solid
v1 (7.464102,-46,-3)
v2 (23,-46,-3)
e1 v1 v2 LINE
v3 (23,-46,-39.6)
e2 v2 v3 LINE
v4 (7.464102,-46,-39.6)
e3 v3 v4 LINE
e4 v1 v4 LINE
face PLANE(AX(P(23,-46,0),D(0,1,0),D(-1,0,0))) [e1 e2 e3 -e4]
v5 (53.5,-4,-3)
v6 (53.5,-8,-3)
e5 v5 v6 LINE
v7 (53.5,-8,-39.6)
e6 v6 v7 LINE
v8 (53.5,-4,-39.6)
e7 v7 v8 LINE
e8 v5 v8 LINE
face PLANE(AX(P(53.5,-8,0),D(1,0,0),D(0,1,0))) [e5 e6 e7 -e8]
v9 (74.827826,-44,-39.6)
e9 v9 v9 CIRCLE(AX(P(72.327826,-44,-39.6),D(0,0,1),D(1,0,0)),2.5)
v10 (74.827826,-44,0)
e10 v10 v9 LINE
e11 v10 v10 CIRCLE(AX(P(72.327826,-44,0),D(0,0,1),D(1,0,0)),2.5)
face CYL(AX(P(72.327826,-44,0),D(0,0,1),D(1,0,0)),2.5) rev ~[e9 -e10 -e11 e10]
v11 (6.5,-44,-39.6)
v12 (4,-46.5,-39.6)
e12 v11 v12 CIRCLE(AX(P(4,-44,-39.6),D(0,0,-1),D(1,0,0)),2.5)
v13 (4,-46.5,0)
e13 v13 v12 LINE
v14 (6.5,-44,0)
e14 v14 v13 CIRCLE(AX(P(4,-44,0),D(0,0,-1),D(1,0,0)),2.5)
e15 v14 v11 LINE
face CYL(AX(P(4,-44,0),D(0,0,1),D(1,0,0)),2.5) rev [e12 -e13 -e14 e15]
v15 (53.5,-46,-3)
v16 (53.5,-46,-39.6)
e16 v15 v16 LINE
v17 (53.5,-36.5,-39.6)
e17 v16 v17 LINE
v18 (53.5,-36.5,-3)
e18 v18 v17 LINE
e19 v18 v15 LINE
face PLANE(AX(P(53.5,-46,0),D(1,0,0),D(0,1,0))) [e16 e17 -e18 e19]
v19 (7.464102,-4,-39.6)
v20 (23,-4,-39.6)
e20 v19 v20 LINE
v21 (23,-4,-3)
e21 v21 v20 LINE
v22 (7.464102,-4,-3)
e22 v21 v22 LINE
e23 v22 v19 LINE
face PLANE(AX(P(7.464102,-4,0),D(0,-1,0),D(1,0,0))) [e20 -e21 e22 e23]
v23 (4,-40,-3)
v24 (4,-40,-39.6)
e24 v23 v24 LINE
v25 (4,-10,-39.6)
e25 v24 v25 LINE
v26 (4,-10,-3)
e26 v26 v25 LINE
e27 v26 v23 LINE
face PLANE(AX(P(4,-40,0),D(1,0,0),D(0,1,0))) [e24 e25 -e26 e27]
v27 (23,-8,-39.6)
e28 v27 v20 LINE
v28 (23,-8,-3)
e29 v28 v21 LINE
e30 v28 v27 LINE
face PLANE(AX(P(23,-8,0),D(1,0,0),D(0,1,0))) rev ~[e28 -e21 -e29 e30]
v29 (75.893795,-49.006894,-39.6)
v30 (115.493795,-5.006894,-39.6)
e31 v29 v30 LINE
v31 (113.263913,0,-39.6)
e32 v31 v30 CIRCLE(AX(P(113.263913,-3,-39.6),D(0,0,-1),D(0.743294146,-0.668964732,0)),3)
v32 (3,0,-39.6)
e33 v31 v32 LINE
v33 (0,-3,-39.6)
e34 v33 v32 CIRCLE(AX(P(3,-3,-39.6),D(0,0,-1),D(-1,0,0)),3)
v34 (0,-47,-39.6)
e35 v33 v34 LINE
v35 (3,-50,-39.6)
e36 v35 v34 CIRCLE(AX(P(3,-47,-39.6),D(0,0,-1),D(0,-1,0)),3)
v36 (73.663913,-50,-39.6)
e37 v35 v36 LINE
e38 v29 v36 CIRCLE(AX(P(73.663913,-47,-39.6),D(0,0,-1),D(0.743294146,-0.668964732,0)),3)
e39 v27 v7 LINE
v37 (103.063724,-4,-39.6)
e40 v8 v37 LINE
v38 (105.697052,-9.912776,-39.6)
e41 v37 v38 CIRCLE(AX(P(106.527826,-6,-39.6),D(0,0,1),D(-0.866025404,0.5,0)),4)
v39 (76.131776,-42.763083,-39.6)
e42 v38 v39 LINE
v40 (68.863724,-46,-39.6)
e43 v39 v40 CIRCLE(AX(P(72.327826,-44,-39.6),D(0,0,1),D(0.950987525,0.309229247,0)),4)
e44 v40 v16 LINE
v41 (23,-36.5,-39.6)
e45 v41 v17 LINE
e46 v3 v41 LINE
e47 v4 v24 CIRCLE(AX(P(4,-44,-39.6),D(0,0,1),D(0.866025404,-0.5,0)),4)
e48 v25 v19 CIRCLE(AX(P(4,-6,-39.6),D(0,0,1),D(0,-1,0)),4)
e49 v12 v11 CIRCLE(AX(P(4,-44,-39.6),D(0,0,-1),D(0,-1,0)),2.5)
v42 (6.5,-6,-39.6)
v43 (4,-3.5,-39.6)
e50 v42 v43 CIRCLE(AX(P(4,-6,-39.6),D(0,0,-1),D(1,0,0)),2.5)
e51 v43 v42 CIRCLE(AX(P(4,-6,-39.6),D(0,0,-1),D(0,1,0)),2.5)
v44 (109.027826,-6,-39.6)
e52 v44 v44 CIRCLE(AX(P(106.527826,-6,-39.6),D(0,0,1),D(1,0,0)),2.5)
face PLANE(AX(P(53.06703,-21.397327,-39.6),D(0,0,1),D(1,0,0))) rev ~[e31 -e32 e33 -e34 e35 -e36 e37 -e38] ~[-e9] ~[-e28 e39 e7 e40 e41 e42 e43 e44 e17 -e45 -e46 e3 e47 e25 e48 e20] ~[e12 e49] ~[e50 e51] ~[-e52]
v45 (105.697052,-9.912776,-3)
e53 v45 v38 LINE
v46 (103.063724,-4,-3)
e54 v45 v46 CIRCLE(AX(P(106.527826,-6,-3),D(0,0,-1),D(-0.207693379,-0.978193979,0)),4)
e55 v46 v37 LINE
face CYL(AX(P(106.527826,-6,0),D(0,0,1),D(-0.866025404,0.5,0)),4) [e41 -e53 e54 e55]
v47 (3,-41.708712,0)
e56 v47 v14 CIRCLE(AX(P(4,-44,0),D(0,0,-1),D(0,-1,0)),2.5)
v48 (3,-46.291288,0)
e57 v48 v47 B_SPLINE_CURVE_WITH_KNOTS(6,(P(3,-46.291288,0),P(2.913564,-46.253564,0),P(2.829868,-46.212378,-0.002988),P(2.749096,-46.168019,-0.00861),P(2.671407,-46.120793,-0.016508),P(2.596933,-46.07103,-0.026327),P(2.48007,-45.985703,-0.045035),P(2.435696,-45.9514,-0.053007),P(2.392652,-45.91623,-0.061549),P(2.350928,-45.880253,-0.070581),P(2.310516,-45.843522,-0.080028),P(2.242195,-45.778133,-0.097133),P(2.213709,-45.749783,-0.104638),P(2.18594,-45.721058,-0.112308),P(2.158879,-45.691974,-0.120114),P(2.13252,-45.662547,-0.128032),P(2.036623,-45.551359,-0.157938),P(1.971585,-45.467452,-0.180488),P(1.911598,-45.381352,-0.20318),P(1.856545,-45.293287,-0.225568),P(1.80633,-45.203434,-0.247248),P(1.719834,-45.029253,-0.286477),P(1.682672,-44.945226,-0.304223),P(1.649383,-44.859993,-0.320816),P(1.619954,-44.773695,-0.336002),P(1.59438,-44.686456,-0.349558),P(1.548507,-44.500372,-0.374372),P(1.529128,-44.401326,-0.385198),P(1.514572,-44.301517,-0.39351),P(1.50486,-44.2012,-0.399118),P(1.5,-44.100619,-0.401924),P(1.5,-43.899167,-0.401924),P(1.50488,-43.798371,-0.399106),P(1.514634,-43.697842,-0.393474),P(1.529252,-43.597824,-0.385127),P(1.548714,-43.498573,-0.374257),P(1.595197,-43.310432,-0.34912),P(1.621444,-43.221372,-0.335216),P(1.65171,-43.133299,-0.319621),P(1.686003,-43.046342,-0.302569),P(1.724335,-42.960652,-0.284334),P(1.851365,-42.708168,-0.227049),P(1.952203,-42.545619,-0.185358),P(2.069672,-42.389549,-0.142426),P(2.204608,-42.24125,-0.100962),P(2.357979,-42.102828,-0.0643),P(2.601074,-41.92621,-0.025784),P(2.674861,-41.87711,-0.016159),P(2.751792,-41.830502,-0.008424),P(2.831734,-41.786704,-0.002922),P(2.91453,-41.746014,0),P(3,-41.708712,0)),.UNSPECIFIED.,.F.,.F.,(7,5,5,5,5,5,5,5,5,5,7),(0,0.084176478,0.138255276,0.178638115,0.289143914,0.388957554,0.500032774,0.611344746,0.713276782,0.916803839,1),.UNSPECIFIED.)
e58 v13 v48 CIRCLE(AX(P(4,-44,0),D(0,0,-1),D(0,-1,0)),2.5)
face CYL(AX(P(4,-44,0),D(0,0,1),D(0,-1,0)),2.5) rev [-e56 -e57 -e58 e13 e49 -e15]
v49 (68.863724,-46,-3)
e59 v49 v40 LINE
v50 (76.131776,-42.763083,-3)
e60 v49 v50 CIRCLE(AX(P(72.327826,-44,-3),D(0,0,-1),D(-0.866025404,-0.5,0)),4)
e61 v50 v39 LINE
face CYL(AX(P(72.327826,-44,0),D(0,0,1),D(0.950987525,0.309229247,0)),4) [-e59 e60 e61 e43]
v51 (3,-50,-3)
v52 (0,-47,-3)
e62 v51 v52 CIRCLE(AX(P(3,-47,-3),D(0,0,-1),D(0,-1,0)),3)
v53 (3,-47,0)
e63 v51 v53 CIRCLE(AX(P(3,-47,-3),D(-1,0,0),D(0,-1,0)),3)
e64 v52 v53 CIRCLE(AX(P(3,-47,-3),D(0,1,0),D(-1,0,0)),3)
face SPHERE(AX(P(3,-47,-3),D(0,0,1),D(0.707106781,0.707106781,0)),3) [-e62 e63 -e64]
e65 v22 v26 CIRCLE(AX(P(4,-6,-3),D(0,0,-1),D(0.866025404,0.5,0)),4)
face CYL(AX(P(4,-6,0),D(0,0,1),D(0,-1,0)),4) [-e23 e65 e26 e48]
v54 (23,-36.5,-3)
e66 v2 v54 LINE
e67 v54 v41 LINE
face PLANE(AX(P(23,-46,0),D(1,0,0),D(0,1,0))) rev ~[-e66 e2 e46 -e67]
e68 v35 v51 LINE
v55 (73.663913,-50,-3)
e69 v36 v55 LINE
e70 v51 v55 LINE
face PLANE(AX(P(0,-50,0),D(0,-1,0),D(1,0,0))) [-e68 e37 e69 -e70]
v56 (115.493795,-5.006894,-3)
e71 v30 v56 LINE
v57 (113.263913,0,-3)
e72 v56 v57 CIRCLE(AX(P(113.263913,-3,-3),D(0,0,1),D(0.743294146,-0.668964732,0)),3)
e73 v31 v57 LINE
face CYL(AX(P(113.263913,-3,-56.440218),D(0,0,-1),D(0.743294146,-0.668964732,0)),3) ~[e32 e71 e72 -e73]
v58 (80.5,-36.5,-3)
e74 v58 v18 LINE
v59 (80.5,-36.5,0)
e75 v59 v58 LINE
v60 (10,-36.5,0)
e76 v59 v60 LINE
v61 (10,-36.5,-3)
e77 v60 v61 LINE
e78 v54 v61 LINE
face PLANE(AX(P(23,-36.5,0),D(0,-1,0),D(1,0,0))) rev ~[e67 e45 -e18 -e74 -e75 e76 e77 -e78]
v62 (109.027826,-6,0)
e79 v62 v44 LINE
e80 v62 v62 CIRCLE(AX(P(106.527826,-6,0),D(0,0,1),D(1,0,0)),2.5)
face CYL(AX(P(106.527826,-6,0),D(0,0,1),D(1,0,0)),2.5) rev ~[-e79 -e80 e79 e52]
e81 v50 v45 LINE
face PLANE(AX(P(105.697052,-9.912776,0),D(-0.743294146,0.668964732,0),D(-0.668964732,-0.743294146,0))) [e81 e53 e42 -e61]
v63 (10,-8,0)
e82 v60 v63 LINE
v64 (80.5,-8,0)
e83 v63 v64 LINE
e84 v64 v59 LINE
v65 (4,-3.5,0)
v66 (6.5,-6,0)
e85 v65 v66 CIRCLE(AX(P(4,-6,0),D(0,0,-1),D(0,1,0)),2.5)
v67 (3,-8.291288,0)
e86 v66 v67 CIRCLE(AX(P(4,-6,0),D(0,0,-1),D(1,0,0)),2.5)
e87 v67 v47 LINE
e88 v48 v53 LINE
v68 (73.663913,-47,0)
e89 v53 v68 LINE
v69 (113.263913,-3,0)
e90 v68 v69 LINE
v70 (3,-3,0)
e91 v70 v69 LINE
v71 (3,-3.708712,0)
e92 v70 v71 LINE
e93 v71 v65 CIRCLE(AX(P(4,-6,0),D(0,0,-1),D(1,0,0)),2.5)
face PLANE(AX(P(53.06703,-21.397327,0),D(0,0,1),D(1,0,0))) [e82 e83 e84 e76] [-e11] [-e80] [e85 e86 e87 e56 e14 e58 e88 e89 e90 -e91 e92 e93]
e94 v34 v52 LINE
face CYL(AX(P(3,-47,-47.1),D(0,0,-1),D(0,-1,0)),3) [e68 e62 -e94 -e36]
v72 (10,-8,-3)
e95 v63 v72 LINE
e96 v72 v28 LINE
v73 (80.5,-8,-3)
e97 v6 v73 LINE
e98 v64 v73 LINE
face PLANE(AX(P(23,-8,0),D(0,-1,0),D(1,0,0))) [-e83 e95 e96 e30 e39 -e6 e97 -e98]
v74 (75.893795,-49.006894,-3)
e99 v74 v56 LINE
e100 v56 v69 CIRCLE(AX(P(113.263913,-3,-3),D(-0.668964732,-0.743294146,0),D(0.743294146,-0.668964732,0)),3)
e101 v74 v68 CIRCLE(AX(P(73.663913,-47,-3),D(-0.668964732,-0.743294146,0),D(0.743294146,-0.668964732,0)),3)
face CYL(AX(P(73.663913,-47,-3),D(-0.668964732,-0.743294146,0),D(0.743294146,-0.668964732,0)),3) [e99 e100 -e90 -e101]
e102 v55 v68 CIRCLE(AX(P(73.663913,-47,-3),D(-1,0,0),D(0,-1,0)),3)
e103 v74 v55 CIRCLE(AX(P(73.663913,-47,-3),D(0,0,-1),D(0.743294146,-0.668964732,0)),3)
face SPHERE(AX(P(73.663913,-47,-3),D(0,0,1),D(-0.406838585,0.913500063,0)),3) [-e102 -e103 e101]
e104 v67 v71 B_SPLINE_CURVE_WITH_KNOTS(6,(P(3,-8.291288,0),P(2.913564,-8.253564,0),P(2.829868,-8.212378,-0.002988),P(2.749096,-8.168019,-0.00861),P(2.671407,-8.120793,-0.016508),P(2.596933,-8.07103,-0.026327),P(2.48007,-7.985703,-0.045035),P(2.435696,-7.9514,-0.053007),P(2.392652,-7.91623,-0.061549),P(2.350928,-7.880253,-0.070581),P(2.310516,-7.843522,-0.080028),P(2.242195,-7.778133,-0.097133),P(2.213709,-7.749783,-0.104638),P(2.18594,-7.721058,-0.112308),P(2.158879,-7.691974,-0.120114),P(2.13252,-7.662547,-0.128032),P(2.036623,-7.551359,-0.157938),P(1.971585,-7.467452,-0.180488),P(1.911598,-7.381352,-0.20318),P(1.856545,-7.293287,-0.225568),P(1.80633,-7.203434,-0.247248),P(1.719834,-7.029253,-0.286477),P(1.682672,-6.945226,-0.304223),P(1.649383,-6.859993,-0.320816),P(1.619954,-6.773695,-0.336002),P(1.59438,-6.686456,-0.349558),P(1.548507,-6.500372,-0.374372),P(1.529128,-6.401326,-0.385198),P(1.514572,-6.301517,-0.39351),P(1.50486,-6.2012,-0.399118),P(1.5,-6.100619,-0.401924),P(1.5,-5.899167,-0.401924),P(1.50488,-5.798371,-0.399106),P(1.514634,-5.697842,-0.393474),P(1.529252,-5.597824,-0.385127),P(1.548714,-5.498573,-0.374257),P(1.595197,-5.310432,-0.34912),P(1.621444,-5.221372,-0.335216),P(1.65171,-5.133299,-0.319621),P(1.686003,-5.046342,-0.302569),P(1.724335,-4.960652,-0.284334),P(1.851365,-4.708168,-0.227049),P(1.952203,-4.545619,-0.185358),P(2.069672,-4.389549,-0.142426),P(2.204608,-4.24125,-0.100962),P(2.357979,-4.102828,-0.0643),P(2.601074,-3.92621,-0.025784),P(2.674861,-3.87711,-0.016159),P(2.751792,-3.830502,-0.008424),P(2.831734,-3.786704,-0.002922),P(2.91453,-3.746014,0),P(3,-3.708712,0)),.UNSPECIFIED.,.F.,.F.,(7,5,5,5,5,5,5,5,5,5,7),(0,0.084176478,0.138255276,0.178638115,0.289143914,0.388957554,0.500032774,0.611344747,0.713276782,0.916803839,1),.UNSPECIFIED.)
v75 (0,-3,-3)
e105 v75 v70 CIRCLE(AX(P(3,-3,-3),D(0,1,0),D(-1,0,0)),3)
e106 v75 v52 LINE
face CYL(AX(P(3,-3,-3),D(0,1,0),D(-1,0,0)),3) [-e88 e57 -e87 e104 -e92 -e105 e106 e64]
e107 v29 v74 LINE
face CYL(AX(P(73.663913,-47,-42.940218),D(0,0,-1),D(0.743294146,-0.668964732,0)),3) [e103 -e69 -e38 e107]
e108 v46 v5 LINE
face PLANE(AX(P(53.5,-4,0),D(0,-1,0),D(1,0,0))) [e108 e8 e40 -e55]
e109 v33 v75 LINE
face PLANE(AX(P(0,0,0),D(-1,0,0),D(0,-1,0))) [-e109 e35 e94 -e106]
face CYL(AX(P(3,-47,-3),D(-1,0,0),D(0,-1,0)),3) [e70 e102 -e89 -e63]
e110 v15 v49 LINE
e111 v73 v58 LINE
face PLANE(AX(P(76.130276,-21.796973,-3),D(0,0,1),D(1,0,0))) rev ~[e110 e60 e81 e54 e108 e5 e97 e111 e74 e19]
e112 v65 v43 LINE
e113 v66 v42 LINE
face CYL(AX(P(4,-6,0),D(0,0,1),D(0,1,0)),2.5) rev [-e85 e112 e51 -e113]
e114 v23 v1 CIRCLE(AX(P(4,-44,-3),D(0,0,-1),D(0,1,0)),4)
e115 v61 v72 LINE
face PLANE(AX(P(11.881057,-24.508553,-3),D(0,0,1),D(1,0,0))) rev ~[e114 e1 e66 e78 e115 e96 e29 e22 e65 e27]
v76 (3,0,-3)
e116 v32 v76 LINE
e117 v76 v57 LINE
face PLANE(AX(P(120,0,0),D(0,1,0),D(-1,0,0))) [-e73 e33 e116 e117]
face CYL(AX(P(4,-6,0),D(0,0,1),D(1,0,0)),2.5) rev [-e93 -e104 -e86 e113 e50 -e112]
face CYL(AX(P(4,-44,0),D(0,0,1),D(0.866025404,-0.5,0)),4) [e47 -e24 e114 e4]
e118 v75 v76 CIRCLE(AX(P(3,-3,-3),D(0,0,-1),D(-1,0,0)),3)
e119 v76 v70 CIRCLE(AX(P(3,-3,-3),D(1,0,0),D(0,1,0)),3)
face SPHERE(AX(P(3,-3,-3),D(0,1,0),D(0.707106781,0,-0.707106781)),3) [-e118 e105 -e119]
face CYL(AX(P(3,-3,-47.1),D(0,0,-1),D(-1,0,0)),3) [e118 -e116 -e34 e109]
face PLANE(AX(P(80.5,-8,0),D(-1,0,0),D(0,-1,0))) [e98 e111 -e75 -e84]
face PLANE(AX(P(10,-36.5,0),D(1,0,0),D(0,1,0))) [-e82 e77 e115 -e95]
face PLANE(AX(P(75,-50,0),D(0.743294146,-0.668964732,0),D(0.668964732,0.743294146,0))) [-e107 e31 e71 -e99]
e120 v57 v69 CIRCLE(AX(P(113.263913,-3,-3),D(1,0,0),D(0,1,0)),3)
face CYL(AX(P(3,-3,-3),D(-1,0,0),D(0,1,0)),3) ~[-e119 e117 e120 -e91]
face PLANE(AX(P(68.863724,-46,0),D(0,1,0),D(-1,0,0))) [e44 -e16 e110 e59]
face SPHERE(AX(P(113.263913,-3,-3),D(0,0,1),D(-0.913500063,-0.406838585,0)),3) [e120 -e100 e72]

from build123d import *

# Parameters (mm, degrees)
F1_DEPTH     = 3
F0_R         = 2.5
F0_W         = 30.5
F0_H         = 9.5
F0_H_2       = 4
F2_DEPTH     = 39.6
F3_T1_DEPTH  = 70.6639127859
F3_T3_DEPTH  = 44.1
F3_T5_DEPTH  = 39.9402180353
F3_T7_DEPTH  = 59.1959458071
F3_T9_DEPTH  = 53.4402180353
F3_T11_DEPTH = 110.2639127859
F3_T13_DEPTH = 44
F3_S17_W     = 3
F3_S17_H     = 3
F3_T18_DEPTH = 3
F3_T24_DEPTH = 3
F3_T30_DEPTH = 3
F3_S35_W     = 3
F3_S35_H     = 3
F3_T36_DEPTH = 3


# Not quite as in the source:
# - a fillet or chamfer that OpenCascade refuses, or shapes differently, is made with other operations: its cross-section is extruded or revolved along the edge and cut away or added


with BuildPart() as f1:
    # F0 (on Top) → F1 (new body)
    with BuildSketch(Plane.XY):
        with BuildLine():
            Line((10, -36.5), (10, -8))
            Line((10, -8), (23, -8))
            Line((23, -8), (23, -4))
            Line((23, -4), (7.4641016151, -4))
            ThreePointArc((7.4641016151, -4), (7.4641016151, -8), (4, -10))
            Line((4, -10), (4, -40))
            ThreePointArc((4, -40), (7.4641016151, -42), (7.4641016151, -46))
            Line((7.4641016151, -46), (23, -46))
            Line((23, -46), (23, -36.5))
            Line((23, -36.5), (10, -36.5))
        make_face()
    extrude(amount=-F1_DEPTH)



with BuildPart() as f1b:
    # F0 (on Top) → F1, piece 2 (new body)
    with BuildSketch(Plane.XY):
        with BuildLine():
            Line((53.5, -4), (53.5, -8))
            Line((53.5, -8), (80.5, -8))
            Line((80.5, -8), (80.5, -36.5))
            Line((80.5, -36.5), (53.5, -36.5))
            Line((53.5, -36.5), (53.5, -46))
            Line((53.5, -46), (68.8637239566, -46))
            ThreePointArc((68.8637239566, -46), (70.700471232, -40.3459997464), (76.1317756715, -42.7630830107))
            Line((76.1317756715, -42.7630830107), (105.697052057, -9.9127759158))
            ThreePointArc((105.697052057, -9.9127759158), (102.8738253182, -7.6273543397), (103.0637239566, -4))
            Line((103.0637239566, -4), (53.5, -4))
        make_face()
    extrude(amount=-F1_DEPTH)


with BuildPart() as f1_1:
    add(f1.part)

    add(f1b.part)  # F2 merges F1b
    # F0 (on Top) → F2 (join)
    with BuildSketch(Plane.XY):
        Polygon((120, 0), (0, 0), (0, -50), (75, -50), align=None)
        with BuildLine():
            ThreePointArc((4, -46.5), (2.232233047, -42.232233047), (6.5, -44))
            ThreePointArc((6.5, -44), (5.767766953, -45.767766953), (4, -46.5))
        make_face(mode=Mode.SUBTRACT)
        with BuildLine():
            Line((7.4641016151, -4), (23, -4))
            Line((23, -4), (53.5, -4))
            Line((53.5, -4), (103.0637239566, -4))
            ThreePointArc((103.0637239566, -4), (102.8738253182, -7.6273543397), (105.697052057, -9.9127759158))
            Line((105.697052057, -9.9127759158), (76.1317756715, -42.7630830107))
            ThreePointArc((76.1317756715, -42.7630830107), (70.700471232, -40.3459997464), (68.8637239566, -46))
            Line((68.8637239566, -46), (53.5, -46))
            Line((53.5, -46), (23, -46))
            Line((23, -46), (7.4641016151, -46))
            ThreePointArc((7.4641016151, -46), (7.4641016151, -42), (4, -40))
            Line((4, -40), (4, -10))
            ThreePointArc((4, -10), (7.4641016151, -8), (7.4641016151, -4))
        make_face(mode=Mode.SUBTRACT)
        with Locations((72.3278255718, -44)):
            Circle(F0_R, mode=Mode.SUBTRACT)
        with BuildLine():
            ThreePointArc((4, -3.5), (5.767766953, -4.232233047), (6.5, -6))
            ThreePointArc((6.5, -6), (2.232233047, -7.767766953), (4, -3.5))
        make_face(mode=Mode.SUBTRACT)
        with Locations((106.5278255718, -6)):
            Circle(F0_R, mode=Mode.SUBTRACT)
        with Locations((38.25, -41.25)):
            Rectangle(F0_W, F0_H)
        with Locations((38.25, -6)):
            Rectangle(F0_W, F0_H_2)
    extrude(amount=-F2_DEPTH)

    # F3: fillet of radius 3 on 8 edges, made by hand

    # F3_s2 → F3_t1 (cut)
    with BuildSketch(Plane.YZ.offset(3)):
        with BuildLine():
            ThreePointArc((-50, -3), (-49.1213203436, -0.8786796564), (-47, 0))
            Line((-47, 0), (-50, 0))
            Line((-50, 0), (-50, -3))
        make_face()
    extrude(amount=F3_T1_DEPTH, mode=Mode.SUBTRACT)

    # F3_s4 → F3_t3 (cut)
    with BuildSketch(Plane.XY.offset(-47.1)):
        with BuildLine():
            ThreePointArc((3, -50), (0.8786796564, -49.1213203436), (0, -47))
            Line((0, -47), (0, -50))
            Line((0, -50), (3, -50))
        make_face()
        with BuildLine():
            ThreePointArc((0, -3), (0.8786796564, -0.8786796564), (3, 0))
            Line((3, 0), (0, 0))
            Line((0, 0), (0, -3))
        make_face()
    extrude(amount=F3_T3_DEPTH, mode=Mode.SUBTRACT)

    # F3_s6 → F3_t5 (cut)
    with BuildSketch(Plane.XY.offset(-42.9402180353)):
        with BuildLine():
            ThreePointArc((75.8937952246, -49.0068941949), (74.8844285407, -49.7405001902), (73.6639127859, -50))
            Line((73.6639127859, -50), (75, -50))
            Line((75, -50), (75.8937952246, -49.0068941949))
        make_face()
    extrude(amount=F3_T5_DEPTH, mode=Mode.SUBTRACT)

    # F3_s8 → F3_t7 (cut)
    with BuildSketch(Plane(origin=(9.5954526832, 10.6616140924, 0), x_dir=(0, 0, 1), z_dir=(0.6689647316, 0.7432941462, 0))):
        with BuildLine():
            ThreePointArc((-3, 89.1952975497), (-0.8786796564, 88.3166178932), (0, 86.1952975497))
            Line((0, 86.1952975497), (0, 89.1952975497))
            Line((0, 89.1952975497), (-3, 89.1952975497))
        make_face()
    extrude(amount=F3_T7_DEPTH, mode=Mode.SUBTRACT)

    # F3_s10 → F3_t9 (cut)
    with BuildSketch(Plane.XY.offset(-56.4402180353)):
        with BuildLine():
            ThreePointArc((115.4937952246, -5.0068941949), (116.004412976, -1.7794842452), (113.2639127859, 0))
            Line((113.2639127859, 0), (120, 0))
            Line((120, 0), (115.4937952246, -5.0068941949))
        make_face()
    extrude(amount=F3_T9_DEPTH, mode=Mode.SUBTRACT)

    # F3_s12 → F3_t11 (cut)
    with BuildSketch(Plane.YZ.offset(3)):
        with BuildLine():
            ThreePointArc((0, -3), (-0.8786796564, -0.8786796564), (-3, 0))
            Line((-3, 0), (0, 0))
            Line((0, 0), (0, -3))
        make_face()
    extrude(amount=F3_T11_DEPTH, mode=Mode.SUBTRACT)

    # F3_s14 → F3_t13 (cut)
    with BuildSketch(Plane.XZ.offset(3)):
        with BuildLine():
            ThreePointArc((0, -3), (0.8786796564, -0.8786796564), (3, 0))
            Line((3, 0), (0, 0))
            Line((0, 0), (0, -3))
        make_face()
    extrude(amount=F3_T13_DEPTH, mode=Mode.SUBTRACT)


with BuildPart() as f3_tool16:
    # F3_s17 → F3_t18 (new body)
    with BuildSketch(Plane.XY.offset(-3)):
        with Locations((1.5, -48.5)):
            Rectangle(F3_S17_W, F3_S17_H)
    extrude(amount=F3_T18_DEPTH)

    # F3_s19 → F3_t20 (revolve, cut)
    with BuildSketch(Plane(origin=(3, -47, -3), x_dir=(0.7071067812, 0.7071067812, 0), z_dir=(0.7071067812, -0.7071067812, 0))):
        with BuildLine():
            ThreePointArc((0, -3), (3, 0), (0, 3))
            Line((0, 3), (0, -3))
        make_face()
    revolve(axis=Axis((3, -47, -3), (0, 0, 1)), mode=Mode.SUBTRACT)


with BuildPart() as f1_2:
    add(f1_1.part)

    # F3_t15: cut F3_tool16
    add(f3_tool16.part, mode=Mode.SUBTRACT)


with BuildPart() as f3_tool22:
    # F3_s23 → F3_t24 (new body)
    with BuildSketch(Plane.XY.offset(-3)):
        Polygon((73.6639127859, -47), (75.8937952246, -49.0068941949), (75, -50), (73.6639127859, -50), align=None)
    extrude(amount=F3_T24_DEPTH)

    # F3_s25 → F3_t26 (revolve, cut)
    with BuildSketch(Plane(origin=(73.6639127859, -47, -3), x_dir=(-0.4068385849, 0.9135000634, 0), z_dir=(0.9135000634, 0.4068385849, 0))):
        with BuildLine():
            ThreePointArc((0, -3), (3, 0), (0, 3))
            Line((0, 3), (0, -3))
        make_face()
    revolve(axis=Axis((73.6639127859, -47, -3), (0, 0, 1)), mode=Mode.SUBTRACT)


with BuildPart() as f1_3:
    add(f1_2.part)

    # F3_t21: cut F3_tool22
    add(f3_tool22.part, mode=Mode.SUBTRACT)


with BuildPart() as f3_tool28:
    # F3_s29 → F3_t30 (new body)
    with BuildSketch(Plane.XY.offset(-3)):
        Polygon((113.2639127859, -3), (115.4937952246, -5.0068941949), (120, 0), (113.2639127859, 0), align=None)
    extrude(amount=F3_T30_DEPTH)

    # F3_s31 → F3_t32 (revolve, cut)
    with BuildSketch(Plane(origin=(113.2639127859, -3, -3), x_dir=(-0.9135000634, -0.4068385849, 0), z_dir=(-0.4068385849, 0.9135000634, 0))):
        with BuildLine():
            ThreePointArc((0, -3), (3, 0), (0, 3))
            Line((0, 3), (0, -3))
        make_face()
    revolve(axis=Axis((113.2639127859, -3, -3), (0, 0, 1)), mode=Mode.SUBTRACT)


with BuildPart() as f1_4:
    add(f1_3.part)

    # F3_t27: cut F3_tool28
    add(f3_tool28.part, mode=Mode.SUBTRACT)


with BuildPart() as f3_tool34:
    # F3_s35 → F3_t36 (new body)
    with BuildSketch(Plane.XZ.offset(3)):
        with Locations((1.5, -1.5)):
            Rectangle(F3_S35_W, F3_S35_H)
    extrude(amount=-F3_T36_DEPTH)

    # F3_s37 → F3_t38 (revolve, cut)
    with BuildSketch(Plane(origin=(3, -3, -3), x_dir=(0.7071067812, 0, -0.7071067812), z_dir=(0.7071067812, 0, 0.7071067812))):
        with BuildLine():
            ThreePointArc((0, -3), (3, 0), (0, 3))
            Line((0, 3), (0, -3))
        make_face()
    revolve(axis=Axis((3, -3, -3), (0, 1, 0)), mode=Mode.SUBTRACT)


with BuildPart() as f1_5:
    add(f1_4.part)

    # F3_t33: cut F3_tool34
    add(f3_tool34.part, mode=Mode.SUBTRACT)


solid = f1_5.part
